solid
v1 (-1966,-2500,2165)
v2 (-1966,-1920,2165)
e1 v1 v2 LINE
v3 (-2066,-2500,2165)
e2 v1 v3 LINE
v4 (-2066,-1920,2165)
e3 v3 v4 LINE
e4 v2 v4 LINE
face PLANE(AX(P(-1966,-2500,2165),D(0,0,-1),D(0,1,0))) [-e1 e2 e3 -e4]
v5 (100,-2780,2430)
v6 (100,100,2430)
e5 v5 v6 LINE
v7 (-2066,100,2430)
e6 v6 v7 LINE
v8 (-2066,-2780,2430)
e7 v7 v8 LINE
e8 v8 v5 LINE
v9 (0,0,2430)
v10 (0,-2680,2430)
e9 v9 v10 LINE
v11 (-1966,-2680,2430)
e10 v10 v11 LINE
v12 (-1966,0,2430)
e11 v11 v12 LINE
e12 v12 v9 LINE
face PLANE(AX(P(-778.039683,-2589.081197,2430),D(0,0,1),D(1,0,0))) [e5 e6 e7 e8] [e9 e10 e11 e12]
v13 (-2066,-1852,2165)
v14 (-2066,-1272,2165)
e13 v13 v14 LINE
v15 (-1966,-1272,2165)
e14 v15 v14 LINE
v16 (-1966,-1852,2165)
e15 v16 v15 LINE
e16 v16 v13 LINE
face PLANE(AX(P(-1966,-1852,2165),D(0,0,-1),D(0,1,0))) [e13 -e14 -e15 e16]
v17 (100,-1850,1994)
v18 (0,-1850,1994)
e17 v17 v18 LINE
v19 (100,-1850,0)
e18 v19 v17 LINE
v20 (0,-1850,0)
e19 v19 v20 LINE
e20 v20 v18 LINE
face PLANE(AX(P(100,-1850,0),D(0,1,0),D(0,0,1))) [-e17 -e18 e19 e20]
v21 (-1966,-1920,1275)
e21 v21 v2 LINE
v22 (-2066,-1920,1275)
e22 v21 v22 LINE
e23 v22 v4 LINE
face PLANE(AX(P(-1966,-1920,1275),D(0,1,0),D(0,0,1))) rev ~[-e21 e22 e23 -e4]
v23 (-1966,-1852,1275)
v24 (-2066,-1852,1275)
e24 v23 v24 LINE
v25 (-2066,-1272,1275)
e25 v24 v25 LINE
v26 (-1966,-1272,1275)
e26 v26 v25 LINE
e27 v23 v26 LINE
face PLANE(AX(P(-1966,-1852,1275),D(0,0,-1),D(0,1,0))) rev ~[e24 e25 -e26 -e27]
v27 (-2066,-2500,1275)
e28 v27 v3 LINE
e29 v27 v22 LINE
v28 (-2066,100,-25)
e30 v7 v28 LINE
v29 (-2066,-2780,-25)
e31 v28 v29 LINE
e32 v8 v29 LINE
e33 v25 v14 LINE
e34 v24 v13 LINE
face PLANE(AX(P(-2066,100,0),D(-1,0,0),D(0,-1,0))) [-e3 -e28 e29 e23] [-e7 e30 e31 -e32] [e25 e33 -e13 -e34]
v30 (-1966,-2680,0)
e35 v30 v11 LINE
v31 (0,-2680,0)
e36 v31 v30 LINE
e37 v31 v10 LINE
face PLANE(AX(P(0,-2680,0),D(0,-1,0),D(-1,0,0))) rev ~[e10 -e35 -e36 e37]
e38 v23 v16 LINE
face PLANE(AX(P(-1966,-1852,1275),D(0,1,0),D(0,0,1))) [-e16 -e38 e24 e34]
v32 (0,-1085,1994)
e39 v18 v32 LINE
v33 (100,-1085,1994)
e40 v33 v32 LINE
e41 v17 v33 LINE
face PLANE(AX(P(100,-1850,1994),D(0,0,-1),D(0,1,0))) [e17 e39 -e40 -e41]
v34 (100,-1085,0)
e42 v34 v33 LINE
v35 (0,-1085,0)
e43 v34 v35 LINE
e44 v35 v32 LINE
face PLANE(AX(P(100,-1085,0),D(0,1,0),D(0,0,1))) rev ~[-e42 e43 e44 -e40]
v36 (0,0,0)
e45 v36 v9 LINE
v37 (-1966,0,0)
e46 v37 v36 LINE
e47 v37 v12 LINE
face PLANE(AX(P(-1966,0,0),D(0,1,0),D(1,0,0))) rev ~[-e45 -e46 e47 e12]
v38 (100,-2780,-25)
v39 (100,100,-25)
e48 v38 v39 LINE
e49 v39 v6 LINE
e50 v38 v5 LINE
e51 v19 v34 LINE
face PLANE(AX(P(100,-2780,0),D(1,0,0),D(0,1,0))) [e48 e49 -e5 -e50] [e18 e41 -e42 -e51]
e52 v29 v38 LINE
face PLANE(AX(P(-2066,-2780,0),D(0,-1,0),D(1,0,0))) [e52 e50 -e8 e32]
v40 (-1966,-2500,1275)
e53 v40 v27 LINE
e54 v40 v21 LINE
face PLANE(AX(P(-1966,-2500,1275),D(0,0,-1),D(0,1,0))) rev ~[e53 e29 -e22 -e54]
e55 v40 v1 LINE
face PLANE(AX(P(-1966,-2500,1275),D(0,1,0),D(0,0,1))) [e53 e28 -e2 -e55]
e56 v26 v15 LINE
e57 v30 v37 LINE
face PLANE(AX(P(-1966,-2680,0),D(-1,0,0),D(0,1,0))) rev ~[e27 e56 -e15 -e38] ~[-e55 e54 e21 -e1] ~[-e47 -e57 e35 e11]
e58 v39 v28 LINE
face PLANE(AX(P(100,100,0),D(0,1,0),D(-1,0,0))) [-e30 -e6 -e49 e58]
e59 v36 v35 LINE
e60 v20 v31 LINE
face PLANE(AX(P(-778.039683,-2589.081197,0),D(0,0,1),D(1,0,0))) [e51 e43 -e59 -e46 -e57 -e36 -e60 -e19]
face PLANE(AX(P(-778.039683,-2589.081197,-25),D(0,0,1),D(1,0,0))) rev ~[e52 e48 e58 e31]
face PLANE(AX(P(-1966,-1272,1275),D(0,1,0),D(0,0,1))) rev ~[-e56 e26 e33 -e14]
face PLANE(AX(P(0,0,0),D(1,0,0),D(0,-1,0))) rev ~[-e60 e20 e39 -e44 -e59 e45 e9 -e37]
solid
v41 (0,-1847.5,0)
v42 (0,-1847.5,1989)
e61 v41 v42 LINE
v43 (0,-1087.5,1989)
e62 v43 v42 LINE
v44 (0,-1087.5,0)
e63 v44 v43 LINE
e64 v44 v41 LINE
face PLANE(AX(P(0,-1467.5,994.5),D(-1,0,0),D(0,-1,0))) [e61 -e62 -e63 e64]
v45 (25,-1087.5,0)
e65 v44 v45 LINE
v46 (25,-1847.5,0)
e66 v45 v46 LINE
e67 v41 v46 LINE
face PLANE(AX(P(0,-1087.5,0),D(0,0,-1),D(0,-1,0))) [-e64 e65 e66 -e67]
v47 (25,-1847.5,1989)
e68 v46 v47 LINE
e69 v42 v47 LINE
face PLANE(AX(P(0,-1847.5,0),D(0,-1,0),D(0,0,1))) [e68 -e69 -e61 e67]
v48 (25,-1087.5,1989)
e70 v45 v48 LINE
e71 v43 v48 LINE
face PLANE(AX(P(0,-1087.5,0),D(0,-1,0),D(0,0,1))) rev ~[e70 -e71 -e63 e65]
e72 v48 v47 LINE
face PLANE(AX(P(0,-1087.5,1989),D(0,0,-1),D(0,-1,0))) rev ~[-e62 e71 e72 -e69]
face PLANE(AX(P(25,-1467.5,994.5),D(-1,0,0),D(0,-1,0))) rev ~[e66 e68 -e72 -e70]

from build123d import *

# Parameters (mm, degrees)
F0_W     = 100
F0_H     = 580
F0_H_2   = 68
F0_H_3   = 765
F1_DEPTH = 2430
F2_W     = 580
F2_H     = 890
F3_DEPTH = 100.001
F4_W     = 765
F4_H     = 1994
F5_DEPTH = 100
F6_W     = 760
F6_H     = 1989
F7_DEPTH = 25
F8_DEPTH = 25


with BuildPart() as f1:
    # F0 (on Top) → F1 (new body)
    with BuildSketch(Plane.XY):
        Polygon((0, -2680), (-1966, -2680), (-1966, -2500), (-2066, -2500), (-2066, -2780), (100, -2780), (100, -1850), (0, -1850), align=None)
        with Locations((-2016, -2210)):
            Rectangle(F0_W, F0_H)
        with Locations((-2016, -1886)):
            Rectangle(F0_W, F0_H_2)
        with Locations((-2016, -1562)):
            Rectangle(F0_W, F0_H)
        with Locations((50, -1467.5)):
            Rectangle(F0_W, F0_H_3)
        Polygon((0, 0), (0, -1085), (100, -1085), (100, 100), (-2066, 100), (-2066, -1272), (-1966, -1272), (-1966, 0), align=None)
    extrude(amount=F1_DEPTH)

    # F2 (on face) → F3 (cut, through all)
    with BuildSketch(Plane.YZ.offset(-1966)):
        with Locations((-1562, 1720)):
            Rectangle(F2_W, F2_H)
        with Locations((-2210, 1720)):
            Rectangle(F2_W, F2_H)
    extrude(amount=-F3_DEPTH, mode=Mode.SUBTRACT)

    # F4 (on face) → F5 (cut, through all)
    with BuildSketch(Plane.YZ.offset(100)):
        with Locations((-1467.5, 997)):
            Rectangle(F4_W, F4_H)
    extrude(amount=-F5_DEPTH, mode=Mode.SUBTRACT)

    # F0 (on Top) → F8 (join)
    with BuildSketch(Plane.XY):
        Polygon((0, -2680), (-1966, -2680), (-1966, -2500), (-2066, -2500), (-2066, -2780), (100, -2780), (100, -1850), (0, -1850), align=None)
        with Locations((-2016, -2210)):
            Rectangle(F0_W, F0_H)
        with Locations((50, -1467.5)):
            Rectangle(F0_W, F0_H_3)
        with Locations((-2016, -1886)):
            Rectangle(F0_W, F0_H_2)
        Polygon((0, 0), (0, -1085), (100, -1085), (100, 100), (-2066, 100), (-2066, -1272), (-1966, -1272), (-1966, 0), align=None)
        with Locations((-2016, -1562)):
            Rectangle(F0_W, F0_H)
        Polygon((-1966, -2500), (-1966, -2680), (0, -2680), (0, -1850), (0, -1085), (0, 0), (-1966, 0), (-1966, -1272), (-1966, -1852), (-1966, -1920), align=None)
    extrude(amount=-F8_DEPTH)


with BuildPart() as f7:
    # F6 (on face) → F7 (new body)
    with BuildSketch(Plane(origin=(0, 0, 0), x_dir=(0, -1, 0), z_dir=(-1, 0, 0))):
        with Locations((1467.5, 994.5)):
            Rectangle(F6_W, F6_H)
    extrude(amount=-F7_DEPTH)


solid = Compound([f1.part, f7.part])
